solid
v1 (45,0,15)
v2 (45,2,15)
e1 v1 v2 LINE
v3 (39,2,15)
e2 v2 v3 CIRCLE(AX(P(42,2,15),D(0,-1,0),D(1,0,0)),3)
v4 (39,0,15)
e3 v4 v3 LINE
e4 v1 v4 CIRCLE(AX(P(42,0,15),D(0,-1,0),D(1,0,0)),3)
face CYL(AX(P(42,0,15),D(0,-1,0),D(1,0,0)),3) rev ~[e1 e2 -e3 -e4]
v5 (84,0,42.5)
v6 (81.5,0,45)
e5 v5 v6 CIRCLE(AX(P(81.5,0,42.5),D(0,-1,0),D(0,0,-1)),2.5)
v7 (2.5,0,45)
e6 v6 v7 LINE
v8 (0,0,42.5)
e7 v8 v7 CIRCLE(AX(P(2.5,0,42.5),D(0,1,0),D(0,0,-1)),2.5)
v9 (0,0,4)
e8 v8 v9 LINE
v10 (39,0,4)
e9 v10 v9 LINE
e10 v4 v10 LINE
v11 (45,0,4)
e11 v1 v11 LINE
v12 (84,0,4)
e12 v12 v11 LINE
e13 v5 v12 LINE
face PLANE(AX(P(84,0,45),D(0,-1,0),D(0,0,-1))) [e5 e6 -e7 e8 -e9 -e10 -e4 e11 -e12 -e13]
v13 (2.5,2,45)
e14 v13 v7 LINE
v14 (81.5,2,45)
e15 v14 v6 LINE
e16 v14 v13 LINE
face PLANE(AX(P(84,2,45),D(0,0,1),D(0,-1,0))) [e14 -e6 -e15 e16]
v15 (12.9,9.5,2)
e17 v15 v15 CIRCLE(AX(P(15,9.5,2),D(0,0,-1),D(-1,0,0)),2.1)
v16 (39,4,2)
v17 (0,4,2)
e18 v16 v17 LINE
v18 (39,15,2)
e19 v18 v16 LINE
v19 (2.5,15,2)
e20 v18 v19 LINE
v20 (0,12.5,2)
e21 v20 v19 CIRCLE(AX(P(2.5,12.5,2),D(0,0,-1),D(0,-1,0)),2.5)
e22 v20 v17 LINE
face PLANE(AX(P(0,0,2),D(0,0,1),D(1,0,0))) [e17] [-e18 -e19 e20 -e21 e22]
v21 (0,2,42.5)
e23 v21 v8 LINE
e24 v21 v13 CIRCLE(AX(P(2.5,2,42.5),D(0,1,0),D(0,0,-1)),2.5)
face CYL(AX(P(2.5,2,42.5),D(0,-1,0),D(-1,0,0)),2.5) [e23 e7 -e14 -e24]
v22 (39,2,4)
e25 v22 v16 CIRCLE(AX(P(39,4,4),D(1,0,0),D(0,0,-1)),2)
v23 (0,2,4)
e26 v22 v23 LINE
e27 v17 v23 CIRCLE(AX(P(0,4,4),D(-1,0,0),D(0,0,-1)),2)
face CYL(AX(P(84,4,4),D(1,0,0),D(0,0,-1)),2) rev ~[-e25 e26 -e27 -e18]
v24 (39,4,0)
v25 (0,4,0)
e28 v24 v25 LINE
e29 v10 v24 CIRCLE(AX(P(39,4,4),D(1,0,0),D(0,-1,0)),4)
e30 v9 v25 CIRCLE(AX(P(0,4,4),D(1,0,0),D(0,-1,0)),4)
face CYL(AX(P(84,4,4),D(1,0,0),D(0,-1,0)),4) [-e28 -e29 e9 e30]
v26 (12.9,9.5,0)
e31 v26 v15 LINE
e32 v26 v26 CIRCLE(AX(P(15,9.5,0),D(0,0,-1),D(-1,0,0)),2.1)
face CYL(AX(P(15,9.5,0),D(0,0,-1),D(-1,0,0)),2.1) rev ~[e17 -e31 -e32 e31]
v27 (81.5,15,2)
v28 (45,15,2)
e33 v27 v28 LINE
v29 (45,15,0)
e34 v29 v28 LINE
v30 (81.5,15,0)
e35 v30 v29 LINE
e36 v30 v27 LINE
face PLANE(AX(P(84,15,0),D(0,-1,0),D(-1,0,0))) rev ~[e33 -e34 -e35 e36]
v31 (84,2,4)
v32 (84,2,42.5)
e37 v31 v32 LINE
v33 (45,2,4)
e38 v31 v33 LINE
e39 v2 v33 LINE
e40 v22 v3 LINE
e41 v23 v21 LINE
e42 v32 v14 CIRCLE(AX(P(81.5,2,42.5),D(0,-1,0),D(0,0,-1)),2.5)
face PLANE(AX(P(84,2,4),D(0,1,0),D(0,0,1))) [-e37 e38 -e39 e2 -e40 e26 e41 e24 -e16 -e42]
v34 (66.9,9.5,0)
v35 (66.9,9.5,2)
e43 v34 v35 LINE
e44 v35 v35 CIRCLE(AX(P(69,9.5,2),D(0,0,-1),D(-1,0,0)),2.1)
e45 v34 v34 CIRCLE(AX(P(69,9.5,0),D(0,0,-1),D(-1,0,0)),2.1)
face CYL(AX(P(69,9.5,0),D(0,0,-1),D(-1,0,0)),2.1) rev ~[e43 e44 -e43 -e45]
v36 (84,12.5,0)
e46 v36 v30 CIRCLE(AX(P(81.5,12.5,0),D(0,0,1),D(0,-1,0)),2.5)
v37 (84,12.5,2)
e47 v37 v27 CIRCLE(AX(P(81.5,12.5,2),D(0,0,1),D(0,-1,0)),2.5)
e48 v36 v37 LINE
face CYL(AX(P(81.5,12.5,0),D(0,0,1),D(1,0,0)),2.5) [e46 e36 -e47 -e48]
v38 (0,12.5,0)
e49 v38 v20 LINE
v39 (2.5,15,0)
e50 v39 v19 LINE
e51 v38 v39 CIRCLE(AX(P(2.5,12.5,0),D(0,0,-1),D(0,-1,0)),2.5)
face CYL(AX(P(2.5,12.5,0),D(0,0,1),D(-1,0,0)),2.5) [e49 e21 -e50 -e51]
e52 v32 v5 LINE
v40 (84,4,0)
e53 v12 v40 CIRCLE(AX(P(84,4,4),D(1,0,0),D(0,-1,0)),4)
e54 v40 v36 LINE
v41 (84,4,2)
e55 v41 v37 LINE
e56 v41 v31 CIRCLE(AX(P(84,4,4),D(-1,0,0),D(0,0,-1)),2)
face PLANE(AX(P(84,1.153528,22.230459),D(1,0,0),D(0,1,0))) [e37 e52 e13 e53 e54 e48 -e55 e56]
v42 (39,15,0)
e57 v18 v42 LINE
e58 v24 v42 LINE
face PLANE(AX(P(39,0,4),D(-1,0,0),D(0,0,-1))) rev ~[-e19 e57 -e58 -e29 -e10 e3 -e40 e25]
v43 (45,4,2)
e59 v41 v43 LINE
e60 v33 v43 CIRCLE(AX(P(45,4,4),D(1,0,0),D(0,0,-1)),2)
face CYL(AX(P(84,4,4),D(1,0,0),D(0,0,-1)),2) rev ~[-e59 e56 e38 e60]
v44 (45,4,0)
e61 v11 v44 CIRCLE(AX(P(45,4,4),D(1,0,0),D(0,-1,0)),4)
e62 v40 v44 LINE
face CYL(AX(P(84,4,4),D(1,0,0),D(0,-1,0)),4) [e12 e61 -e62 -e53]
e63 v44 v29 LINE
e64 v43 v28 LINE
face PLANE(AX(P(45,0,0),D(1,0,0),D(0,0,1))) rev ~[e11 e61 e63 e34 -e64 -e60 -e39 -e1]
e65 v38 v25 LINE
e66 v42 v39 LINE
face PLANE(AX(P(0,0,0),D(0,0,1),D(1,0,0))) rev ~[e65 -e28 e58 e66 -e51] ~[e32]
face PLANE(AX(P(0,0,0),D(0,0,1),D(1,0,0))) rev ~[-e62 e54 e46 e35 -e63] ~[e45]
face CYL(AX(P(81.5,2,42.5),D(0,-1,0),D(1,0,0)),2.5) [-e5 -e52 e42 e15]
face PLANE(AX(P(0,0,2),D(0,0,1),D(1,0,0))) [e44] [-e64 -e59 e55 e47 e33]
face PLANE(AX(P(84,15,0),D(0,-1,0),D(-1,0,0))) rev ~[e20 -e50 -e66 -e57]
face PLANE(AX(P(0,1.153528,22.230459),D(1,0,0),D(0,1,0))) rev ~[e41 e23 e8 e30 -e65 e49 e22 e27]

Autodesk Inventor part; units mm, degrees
ref_plane "YZ Plane" through (0, 0, 0) normal (1, 0, 0) x (0, 1, 0)
ref_plane "XZ Plane" through (0, 0, 0) normal (0, 1, 0) x (-1, 0, 0)
ref_plane "XY Plane" through (0, 0, 0) normal (0, 0, 1) x (1, 0, 0)
sketch "Sketch1" plane through (0, 0, 0) normal (0, 0, 1) x (1, 0, 0)
  line L0 (0, 0) -> (84, 0)
  line L1 (84, 0) -> (84, 15)
  line L2 (84, 15) -> (0, 15)
  line L3 (0, 15) -> (0, 0)
  dimension "d0" = 84
  dimension "d1" = 15
extrude "Plate1" add sketch "Sketch1" along normal blind 2
sketch "Sketch2" plane through (84, 2, 0) normal (0, -1, 0) x (1, 0, 0)
  line L0 (-84, 0) -> (0, 0)
  line L1 (0, 0) -> (0, 45)
  line L2 (0, 45) -> (-84, 45)
  line L3 (-84, 45) -> (-84, 0)
edge flange "Flange1" height 45 angle 90 thickness 2 bend radius 2 thickness toward (0, -1, 0) relief tear relief width 2 relief depth 1 edges at (42, 0, 2) wall of the first edge with corners at (0, 2, 0) (84, 2, 0) (84, 2, 45) (0, 2, 45)
bend "Bend1"
corner "Corner1"
sketch "Sketch3" plane through (0, 0, 0) normal (0, 0, -1) x (-1, 0, 0)
  line L0 (-84, 4) -> (0, 4) projected
  line L1 (0, 15) -> (0, 4) projected
  line L2 (-84, 15) -> (0, 15) projected
  line L3 (-84, 4) -> (-84, 15) projected
  circle A0 centre (-15, 9.5) radius 2.1
  circle A1 centre (-69, 9.5) radius 2.1
  point P0 (0, 0)
  point P1 (-84, 9.5)
  dimension "d13" = 15
  dimension "d14" = 15
  dimension "d15" = 4.2
extrude "Cut1" cut sketch "Sketch3" against normal blind 2 contours A0 | A1
fillet "Corner Round1" radius 2.5 4 edges at (84, 15, 1) (0, 15, 1) (84, 1, 45) (0, 1, 45)
sketch "Sketch5" plane through (0, 0, 4) normal (0, -1, 0) x (1, 0, 0)
  arc A0 (84, 38.5) -> (81.5, 41) centre (81.5, 38.5) ccw projected
  line L0 (2.5, 41) -> (81.5, 41) projected
  arc A1 (2.5, 41) -> (0, 38.5) centre (2.5, 38.5) ccw projected
  line L1 (0, 0) -> (0, 38.5) projected
  line L2 (0, 0) -> (84, 0) projected
  line L3 (84, 38.5) -> (84, 0) projected
  line L4 (84, -4) -> (84, 0) projected
  line L5 (0, 0) -> (0, -4) projected
  line L6 (84, -4) -> (0, -4) projected
  line L7 (81.5, -4) -> (2.5, -4) projected
  line L8 (45, 11) -> (39, 11)
  line L9 (39, 11) -> (39, -4)
  line L10 (39, -4) -> (45, -4)
  line L11 (45, -4) -> (45, 11)
  line L12 (45, 11) -> (39, -4) construction
  line L13 (39, 11) -> (45, -4) construction
  circle A2 centre (42, 11) radius 3
  point P0 (42, 3.5)
  point P1 (42, -4)
  dimension "d24" = 6
  dimension "d25" = 15
extrude "Cut3" cut sketch "Sketch5" against normal through all contours L11 L6 L9 L2 | L2 L9 A2 L11 | A2 L8 | L8 A2
equation "\"d14\" = d13"
equation "\"d16\" = Thickness"
equation "\"d26\" = Thickness"
equation "\"d2\" = Thickness"
equation "\"d3\" = BendReliefWidth"
equation "\"d4\" = BendReliefDepth"
equation "\"d5\" = MinimumRemnant"
equation "\"d6\" = TransitionRadius"
equation "\"d9\" = BendRadius"
equation "\"d10\" = CornerReliefSize"
equation "\"d11\" = GapSize"
equation "\"d12\" = JacobiRadiusSize"
equation "\"BendRadius\" = Thickness"
equation "\"BendReliefWidth\" = Thickness"
equation "\"BendReliefDepth\" = 0.5 * Thickness"
equation "\"CornerReliefSize\" = 4 * Thickness"
equation "\"MinimumRemnant\" = 2 * Thickness"
equation "\"TransitionRadius\" = BendRadius"
equation "\"JacobiRadiusSize\" = BendRadius"
equation "\"GapSize\" = Thickness"
equation "\"Thickness\" = 2"
properties part number "backing plate lidar" material "Aluminum 6061"
